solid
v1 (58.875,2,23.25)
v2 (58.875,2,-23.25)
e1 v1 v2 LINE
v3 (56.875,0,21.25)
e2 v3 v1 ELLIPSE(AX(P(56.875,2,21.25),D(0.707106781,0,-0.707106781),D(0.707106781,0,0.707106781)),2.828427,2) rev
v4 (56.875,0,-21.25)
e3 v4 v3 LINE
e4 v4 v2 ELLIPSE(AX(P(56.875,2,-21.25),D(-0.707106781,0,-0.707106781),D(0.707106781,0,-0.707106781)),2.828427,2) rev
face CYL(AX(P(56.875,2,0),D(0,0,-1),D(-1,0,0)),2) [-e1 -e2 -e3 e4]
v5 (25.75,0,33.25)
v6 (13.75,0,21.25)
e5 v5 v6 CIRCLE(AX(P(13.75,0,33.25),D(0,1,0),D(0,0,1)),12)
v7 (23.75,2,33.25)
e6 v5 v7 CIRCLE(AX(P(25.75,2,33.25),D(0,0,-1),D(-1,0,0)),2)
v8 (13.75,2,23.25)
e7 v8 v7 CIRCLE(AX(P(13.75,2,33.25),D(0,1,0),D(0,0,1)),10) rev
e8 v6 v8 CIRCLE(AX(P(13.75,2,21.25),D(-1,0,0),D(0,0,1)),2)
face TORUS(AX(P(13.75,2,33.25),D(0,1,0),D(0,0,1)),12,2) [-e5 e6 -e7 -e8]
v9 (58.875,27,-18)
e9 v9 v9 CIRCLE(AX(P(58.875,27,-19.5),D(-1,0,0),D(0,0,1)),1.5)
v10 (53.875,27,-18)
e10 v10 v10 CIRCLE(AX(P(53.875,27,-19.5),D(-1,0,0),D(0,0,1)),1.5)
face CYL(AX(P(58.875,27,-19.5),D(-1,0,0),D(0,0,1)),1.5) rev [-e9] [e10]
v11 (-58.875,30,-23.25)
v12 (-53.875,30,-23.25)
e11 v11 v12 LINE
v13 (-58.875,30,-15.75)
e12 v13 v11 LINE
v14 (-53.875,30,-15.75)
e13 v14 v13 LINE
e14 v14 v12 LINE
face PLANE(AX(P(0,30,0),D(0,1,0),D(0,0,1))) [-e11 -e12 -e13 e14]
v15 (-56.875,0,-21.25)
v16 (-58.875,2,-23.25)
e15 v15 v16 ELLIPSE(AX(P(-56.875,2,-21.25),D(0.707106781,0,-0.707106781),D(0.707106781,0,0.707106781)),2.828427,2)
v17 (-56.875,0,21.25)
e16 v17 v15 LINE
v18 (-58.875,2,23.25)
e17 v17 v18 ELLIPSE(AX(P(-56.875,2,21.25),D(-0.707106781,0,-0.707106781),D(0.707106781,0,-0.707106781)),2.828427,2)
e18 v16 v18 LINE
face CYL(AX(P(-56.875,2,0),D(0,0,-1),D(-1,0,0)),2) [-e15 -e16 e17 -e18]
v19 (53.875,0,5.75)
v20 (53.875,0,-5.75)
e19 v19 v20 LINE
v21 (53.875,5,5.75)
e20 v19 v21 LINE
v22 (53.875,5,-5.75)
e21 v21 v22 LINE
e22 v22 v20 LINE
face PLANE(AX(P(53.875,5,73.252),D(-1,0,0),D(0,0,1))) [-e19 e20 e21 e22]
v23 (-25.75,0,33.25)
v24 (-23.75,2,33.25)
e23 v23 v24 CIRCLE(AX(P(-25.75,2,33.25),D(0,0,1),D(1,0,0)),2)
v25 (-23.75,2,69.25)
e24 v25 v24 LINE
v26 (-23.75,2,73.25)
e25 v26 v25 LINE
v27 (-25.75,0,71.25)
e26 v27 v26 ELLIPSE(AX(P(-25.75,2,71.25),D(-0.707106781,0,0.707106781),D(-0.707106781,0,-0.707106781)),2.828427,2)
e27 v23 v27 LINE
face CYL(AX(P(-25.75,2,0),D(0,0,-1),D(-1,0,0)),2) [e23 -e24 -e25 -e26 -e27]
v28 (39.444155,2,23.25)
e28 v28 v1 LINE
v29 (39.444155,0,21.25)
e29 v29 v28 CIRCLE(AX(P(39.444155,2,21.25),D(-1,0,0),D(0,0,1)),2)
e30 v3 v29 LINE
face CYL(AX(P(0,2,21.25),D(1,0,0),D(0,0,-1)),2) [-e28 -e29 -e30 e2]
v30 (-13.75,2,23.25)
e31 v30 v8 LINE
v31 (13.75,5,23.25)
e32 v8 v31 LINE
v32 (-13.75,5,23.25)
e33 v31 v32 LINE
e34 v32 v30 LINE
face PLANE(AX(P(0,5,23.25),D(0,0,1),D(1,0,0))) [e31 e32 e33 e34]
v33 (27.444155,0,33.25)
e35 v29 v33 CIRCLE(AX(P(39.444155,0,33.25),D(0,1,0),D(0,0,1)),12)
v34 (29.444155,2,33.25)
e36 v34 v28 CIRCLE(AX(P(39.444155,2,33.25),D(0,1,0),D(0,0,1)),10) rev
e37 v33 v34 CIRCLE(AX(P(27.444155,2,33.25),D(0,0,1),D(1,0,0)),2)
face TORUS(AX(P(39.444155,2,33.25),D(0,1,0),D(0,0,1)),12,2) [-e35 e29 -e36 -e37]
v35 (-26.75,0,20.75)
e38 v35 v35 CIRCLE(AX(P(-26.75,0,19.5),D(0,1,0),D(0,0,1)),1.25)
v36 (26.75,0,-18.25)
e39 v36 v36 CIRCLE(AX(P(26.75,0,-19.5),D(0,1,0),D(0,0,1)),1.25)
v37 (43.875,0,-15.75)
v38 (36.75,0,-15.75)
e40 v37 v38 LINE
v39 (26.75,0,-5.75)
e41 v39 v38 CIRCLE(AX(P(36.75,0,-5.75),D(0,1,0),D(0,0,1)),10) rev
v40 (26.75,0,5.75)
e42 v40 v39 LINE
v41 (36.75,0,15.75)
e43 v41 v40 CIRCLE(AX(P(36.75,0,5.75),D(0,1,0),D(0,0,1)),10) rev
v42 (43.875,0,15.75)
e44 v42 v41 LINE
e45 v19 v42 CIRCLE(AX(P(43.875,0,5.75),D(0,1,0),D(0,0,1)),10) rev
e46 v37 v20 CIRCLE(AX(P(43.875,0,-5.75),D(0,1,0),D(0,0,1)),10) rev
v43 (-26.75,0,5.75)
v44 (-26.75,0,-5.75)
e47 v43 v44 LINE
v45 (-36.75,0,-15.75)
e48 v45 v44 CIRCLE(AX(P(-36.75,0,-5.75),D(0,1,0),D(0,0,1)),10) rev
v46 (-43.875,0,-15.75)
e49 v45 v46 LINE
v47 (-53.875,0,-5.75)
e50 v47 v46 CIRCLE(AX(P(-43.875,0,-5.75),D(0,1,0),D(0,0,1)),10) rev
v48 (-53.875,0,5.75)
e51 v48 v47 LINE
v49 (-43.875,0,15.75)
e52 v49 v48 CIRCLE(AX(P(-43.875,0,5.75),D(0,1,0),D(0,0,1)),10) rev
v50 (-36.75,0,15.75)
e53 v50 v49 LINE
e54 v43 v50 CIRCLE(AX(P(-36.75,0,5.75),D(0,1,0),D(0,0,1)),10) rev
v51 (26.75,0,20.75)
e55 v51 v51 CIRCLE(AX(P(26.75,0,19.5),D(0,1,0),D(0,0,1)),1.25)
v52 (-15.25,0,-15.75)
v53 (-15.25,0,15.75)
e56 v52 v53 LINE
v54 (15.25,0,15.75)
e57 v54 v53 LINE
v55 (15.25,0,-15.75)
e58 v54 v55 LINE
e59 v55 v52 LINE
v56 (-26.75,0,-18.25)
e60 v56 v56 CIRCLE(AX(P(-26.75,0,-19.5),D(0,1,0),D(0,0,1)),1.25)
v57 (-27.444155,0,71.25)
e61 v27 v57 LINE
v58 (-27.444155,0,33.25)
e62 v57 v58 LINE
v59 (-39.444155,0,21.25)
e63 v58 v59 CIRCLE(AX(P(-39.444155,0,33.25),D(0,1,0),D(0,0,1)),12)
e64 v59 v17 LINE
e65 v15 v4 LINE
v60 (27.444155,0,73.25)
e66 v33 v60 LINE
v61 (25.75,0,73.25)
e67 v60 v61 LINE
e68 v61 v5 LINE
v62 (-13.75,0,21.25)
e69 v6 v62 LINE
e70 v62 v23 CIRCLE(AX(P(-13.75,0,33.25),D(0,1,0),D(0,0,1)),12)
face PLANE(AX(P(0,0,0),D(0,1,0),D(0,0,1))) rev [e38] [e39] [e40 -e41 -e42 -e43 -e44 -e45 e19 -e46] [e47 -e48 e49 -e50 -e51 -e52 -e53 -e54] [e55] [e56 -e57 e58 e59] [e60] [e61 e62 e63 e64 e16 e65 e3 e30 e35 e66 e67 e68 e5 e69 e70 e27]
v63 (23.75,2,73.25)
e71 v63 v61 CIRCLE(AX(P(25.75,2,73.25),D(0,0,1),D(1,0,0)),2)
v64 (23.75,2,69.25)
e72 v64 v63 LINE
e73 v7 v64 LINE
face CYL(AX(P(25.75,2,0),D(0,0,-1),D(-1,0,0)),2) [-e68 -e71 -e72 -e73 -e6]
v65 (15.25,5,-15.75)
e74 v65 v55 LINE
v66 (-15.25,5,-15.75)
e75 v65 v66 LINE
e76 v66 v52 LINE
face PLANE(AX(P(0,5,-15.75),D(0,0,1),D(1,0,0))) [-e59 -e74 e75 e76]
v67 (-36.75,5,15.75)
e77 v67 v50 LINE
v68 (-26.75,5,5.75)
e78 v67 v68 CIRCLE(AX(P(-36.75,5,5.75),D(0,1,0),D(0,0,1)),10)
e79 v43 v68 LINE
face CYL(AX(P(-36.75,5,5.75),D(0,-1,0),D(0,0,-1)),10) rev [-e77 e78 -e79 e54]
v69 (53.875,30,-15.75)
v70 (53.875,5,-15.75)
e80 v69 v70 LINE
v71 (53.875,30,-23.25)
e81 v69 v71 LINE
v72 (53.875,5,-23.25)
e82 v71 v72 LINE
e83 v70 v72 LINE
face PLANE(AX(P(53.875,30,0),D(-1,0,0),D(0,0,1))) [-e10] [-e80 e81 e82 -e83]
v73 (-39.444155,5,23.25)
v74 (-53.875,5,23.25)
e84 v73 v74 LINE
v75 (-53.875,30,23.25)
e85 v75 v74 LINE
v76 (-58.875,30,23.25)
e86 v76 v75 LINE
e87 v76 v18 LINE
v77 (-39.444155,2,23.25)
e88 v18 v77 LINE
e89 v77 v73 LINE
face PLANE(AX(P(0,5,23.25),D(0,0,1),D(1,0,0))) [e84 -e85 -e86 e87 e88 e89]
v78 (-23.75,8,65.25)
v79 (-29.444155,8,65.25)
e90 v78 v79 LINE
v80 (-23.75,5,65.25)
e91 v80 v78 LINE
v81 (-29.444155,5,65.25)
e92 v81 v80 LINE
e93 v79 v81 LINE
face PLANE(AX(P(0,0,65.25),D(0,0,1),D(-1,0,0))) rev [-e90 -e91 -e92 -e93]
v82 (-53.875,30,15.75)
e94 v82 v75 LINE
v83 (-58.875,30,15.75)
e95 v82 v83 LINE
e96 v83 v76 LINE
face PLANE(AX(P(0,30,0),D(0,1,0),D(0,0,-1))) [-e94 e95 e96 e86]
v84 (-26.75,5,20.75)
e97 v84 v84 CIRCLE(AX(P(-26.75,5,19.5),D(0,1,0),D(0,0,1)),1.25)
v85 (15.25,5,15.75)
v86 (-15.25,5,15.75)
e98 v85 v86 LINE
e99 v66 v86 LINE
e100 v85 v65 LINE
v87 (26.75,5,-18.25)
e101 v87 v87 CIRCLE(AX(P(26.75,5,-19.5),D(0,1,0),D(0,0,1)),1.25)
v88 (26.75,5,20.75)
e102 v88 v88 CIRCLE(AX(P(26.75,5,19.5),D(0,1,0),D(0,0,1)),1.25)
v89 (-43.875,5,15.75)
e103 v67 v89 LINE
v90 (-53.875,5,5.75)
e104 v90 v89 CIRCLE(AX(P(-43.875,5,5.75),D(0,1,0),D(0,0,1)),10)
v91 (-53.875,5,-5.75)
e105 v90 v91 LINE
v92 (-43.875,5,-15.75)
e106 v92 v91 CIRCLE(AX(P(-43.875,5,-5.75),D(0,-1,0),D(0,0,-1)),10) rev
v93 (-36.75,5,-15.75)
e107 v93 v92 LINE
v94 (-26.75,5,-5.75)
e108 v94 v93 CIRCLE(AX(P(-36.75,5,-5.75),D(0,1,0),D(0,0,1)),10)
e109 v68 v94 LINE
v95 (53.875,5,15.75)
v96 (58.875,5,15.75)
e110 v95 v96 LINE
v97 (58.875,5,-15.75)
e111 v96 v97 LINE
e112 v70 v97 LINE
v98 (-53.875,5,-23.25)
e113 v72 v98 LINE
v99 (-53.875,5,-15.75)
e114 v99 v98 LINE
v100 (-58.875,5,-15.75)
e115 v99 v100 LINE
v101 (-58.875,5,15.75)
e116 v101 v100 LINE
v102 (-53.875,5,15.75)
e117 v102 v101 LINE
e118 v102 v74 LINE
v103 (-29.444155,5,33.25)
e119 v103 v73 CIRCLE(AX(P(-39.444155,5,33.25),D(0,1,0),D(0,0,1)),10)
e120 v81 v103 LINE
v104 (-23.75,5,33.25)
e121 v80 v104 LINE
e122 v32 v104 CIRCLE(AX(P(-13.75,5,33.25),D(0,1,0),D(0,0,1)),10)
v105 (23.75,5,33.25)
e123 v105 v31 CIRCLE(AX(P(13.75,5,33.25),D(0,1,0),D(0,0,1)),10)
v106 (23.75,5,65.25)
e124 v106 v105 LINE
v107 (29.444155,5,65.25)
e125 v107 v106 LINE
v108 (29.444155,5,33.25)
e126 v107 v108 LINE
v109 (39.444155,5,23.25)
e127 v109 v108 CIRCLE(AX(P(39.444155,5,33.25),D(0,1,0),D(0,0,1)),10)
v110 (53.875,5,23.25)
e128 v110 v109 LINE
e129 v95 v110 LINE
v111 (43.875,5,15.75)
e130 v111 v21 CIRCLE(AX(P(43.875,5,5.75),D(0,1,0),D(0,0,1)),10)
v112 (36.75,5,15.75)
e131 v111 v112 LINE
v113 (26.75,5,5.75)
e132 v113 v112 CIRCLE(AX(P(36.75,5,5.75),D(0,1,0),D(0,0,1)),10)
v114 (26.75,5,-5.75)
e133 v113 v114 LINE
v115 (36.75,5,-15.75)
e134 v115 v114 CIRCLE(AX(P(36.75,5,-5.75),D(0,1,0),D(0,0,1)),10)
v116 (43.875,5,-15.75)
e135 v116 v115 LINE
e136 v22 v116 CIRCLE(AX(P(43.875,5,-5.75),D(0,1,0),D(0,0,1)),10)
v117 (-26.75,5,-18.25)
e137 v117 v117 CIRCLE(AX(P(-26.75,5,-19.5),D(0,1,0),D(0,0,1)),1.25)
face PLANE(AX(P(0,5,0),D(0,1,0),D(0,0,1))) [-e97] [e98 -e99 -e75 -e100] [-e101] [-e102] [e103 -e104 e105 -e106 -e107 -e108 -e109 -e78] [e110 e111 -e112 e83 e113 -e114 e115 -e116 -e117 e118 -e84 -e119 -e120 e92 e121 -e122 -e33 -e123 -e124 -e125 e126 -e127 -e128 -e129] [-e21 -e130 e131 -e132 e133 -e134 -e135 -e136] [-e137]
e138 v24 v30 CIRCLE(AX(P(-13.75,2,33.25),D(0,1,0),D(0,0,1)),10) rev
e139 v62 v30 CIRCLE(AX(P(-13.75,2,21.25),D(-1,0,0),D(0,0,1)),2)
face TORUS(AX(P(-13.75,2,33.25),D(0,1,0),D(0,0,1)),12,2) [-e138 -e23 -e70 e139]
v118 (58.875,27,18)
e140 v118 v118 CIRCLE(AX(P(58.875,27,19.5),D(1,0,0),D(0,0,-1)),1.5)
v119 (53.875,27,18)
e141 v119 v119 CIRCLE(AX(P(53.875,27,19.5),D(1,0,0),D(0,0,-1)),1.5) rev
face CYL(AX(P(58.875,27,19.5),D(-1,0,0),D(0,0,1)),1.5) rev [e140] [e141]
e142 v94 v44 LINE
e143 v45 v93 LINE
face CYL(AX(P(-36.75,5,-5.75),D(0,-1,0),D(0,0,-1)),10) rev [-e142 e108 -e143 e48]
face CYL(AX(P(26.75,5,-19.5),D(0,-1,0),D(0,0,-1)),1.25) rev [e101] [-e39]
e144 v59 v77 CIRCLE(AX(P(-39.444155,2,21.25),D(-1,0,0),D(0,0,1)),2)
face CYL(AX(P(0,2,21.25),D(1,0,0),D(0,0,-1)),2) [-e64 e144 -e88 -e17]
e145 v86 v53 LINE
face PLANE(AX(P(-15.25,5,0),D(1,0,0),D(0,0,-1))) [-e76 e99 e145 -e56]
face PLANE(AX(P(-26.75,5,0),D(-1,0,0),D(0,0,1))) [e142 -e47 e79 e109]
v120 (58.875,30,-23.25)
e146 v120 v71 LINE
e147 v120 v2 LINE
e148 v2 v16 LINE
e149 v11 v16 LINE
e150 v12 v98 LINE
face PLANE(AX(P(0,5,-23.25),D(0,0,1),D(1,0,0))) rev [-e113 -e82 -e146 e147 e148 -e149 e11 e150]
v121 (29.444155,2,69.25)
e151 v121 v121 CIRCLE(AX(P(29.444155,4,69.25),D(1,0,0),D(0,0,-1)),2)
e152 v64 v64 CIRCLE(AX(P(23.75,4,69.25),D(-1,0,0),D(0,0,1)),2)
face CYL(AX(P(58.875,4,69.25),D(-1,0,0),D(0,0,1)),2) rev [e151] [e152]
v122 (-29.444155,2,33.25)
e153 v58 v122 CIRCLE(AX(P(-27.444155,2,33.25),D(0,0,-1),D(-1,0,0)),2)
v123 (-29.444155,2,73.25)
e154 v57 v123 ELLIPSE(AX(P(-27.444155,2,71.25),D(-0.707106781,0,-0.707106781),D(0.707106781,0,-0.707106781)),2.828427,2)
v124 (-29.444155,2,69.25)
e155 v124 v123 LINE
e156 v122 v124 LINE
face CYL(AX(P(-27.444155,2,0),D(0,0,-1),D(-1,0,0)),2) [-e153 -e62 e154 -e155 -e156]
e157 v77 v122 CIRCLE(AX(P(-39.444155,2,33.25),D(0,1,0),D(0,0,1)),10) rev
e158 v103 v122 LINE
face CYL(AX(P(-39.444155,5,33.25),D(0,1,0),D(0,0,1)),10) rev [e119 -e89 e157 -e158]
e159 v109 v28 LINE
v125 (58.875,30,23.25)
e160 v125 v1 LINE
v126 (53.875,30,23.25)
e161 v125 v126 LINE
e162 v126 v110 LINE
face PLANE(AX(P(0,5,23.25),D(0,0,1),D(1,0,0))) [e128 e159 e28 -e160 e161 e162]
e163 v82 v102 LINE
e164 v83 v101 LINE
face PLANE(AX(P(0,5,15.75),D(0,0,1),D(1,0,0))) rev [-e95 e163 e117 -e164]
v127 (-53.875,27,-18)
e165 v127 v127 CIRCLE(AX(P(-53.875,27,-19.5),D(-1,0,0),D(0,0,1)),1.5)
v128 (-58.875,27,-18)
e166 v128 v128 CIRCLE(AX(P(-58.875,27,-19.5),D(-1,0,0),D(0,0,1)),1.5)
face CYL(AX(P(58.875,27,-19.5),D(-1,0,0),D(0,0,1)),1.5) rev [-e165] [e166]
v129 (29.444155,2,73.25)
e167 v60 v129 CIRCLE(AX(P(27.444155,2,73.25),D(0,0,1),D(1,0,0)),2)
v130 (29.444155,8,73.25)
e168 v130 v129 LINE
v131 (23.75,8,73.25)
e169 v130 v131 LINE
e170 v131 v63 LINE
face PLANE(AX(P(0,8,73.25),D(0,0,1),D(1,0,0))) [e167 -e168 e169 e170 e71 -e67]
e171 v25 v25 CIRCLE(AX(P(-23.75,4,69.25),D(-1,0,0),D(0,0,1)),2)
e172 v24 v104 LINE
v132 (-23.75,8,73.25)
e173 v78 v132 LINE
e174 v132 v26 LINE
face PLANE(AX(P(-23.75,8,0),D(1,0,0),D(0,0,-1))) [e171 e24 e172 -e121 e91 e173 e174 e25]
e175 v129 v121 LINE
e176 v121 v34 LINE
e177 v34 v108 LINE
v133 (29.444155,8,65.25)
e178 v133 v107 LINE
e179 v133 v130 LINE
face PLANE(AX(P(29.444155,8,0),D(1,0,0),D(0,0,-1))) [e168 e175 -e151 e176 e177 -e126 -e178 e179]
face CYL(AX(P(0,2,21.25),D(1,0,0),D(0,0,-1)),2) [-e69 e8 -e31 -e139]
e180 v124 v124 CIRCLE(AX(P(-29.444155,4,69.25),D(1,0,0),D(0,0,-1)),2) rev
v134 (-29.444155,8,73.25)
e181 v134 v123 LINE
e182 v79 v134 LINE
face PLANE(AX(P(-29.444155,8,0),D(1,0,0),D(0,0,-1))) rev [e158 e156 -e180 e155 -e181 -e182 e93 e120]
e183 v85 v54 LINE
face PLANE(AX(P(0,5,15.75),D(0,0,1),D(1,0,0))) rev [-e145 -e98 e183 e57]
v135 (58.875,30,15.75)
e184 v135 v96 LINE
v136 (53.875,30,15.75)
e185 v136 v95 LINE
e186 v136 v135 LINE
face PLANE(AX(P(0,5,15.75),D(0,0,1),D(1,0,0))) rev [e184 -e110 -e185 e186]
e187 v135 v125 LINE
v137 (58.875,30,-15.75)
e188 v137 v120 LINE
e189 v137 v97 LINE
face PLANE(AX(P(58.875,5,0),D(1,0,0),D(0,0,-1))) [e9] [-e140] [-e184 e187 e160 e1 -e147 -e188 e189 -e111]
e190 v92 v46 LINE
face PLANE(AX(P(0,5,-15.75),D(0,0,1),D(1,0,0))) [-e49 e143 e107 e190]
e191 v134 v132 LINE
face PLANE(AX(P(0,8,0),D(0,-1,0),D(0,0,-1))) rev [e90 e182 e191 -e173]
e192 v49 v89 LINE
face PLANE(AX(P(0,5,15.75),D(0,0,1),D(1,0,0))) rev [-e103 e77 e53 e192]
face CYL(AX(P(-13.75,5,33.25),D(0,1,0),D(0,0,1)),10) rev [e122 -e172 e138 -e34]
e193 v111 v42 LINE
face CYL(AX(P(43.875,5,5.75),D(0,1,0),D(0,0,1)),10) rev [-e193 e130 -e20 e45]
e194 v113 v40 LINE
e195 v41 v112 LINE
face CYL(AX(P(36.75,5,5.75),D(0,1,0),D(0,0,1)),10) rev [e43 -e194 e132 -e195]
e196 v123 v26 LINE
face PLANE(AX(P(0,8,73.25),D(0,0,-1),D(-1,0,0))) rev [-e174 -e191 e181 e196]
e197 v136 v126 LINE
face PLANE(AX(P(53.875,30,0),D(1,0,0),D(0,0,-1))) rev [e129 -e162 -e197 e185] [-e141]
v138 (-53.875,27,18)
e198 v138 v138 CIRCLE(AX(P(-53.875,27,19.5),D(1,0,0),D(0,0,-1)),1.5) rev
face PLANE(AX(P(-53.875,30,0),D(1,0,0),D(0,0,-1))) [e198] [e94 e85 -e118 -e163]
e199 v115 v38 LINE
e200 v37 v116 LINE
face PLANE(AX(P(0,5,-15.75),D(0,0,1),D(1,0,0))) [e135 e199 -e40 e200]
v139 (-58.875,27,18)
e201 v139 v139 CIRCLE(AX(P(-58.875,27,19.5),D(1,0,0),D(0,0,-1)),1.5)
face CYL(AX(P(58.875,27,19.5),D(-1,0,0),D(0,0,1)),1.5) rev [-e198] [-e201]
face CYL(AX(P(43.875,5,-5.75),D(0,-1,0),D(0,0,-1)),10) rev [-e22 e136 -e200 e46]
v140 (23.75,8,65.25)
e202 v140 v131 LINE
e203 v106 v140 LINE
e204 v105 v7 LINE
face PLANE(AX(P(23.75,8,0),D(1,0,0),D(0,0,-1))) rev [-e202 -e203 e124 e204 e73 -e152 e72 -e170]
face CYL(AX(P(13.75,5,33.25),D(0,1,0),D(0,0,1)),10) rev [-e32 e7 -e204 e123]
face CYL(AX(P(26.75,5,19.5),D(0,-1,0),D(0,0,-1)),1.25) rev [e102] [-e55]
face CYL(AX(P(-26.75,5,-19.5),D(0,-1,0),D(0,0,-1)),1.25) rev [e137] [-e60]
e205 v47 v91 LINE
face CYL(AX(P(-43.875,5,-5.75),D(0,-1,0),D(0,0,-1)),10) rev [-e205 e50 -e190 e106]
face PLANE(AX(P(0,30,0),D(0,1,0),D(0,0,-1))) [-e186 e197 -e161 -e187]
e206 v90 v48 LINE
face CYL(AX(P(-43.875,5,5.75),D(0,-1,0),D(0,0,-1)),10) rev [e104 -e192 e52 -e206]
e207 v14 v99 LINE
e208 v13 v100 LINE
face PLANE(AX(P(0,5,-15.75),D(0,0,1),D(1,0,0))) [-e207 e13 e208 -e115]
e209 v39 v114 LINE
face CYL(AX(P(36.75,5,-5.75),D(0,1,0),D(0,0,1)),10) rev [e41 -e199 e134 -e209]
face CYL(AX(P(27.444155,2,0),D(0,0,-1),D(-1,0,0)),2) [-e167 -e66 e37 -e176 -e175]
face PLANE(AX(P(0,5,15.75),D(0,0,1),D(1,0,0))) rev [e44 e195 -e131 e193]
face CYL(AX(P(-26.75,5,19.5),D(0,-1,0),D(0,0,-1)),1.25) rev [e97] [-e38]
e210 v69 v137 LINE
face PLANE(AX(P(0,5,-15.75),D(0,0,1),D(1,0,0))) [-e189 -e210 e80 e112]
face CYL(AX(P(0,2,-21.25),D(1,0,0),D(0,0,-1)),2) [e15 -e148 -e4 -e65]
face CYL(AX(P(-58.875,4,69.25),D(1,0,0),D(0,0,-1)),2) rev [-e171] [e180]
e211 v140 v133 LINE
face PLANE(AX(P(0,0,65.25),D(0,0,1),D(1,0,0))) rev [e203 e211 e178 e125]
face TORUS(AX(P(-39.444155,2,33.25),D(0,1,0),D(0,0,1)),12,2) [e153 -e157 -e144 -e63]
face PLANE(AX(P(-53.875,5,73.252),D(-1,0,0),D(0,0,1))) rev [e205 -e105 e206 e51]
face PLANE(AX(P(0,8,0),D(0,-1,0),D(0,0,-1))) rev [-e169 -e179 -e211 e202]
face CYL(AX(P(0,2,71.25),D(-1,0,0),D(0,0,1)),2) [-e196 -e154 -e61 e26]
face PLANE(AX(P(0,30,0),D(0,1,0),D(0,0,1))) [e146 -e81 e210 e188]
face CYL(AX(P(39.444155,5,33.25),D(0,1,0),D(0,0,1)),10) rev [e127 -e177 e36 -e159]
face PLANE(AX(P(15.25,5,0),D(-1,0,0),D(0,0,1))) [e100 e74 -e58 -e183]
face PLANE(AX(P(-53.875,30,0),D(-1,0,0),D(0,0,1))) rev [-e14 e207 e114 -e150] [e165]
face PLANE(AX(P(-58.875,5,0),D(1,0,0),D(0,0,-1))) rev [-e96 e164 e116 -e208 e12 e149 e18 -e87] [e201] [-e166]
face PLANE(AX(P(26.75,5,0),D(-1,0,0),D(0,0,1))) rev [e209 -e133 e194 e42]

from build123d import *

# Parameters (mm, degrees)
BOSS_EXTRUDE1_DEPTH     = 5
FILLET1_R               = 10
FILLET2_R               = 10
FILLET3_R               = 10
FILLET4_R               = 10
SKETCH2_W               = 5
SKETCH2_H               = 7.5
BOSS_EXTRUDE2_DEPTH     = 25
MIRROR2_COPY_1_SKETCH_W = 5
MIRROR2_COPY_1_SKETCH_H = 7.5
MIRROR2_COPY_1_DEPTH    = 25
SKETCH3_R               = 1.5
CUT_EXTRUDE1_DEPTH      = 119.966907163
SKETCH4_W               = 2.694155106
SKETCH4_H               = 50
SKETCH4_W_2             = 3
BOSS_EXTRUDE3_DEPTH     = 8
SKETCH5_W               = 5.694155106
SKETCH5_H               = 3
CUT_EXTRUDE2_DEPTH      = 42
CUT_EXTRUDE3_DEPTH      = 115.422257996
FILLET5_R               = 10
FILLET6_R               = 10
FILLET7_R               = 10
FILLET8_R               = 10
BOSS_EXTRUDE4_REACH     = 112.848
SKETCH7_W               = 5
SKETCH7_H               = 5
FILLET9_R               = 10
FILLET10_DEPTH          = 5
FILLET11_R              = 10
FILLET12_DEPTH          = 5
FILLET13_R              = 2


with BuildPart() as part:
    # Sketch1 → Boss-Extrude1 (new body)
    with BuildSketch(Plane(origin=(0, 0, 0), x_dir=(1, 0, 0), z_dir=(0, 1, 0))):
        with BuildLine():
            Line((-34.25, 15.75), (-26.75, 15.75))
            Line((-26.75, 15.75), (-26.75, 18.25))
            ThreePointArc((-26.75, 18.25), (-27.633883476, 20.383883476), (-25.5, 19.5))
            Line((-25.5, 19.5), (25.5, 19.5))
            ThreePointArc((25.5, 19.5), (26.75, 20.75), (28, 19.5))
            ThreePointArc((28, 19.5), (27.633883476, 18.616116524), (26.75, 18.25))
            Line((26.75, 18.25), (26.75, 15.75))
            Line((26.75, 15.75), (34.25, 15.75))
            Line((34.25, 15.75), (58.875, 15.75))
            Line((58.875, 15.75), (58.875, 23.25))
            Line((58.875, 23.25), (-58.875, 23.25))
            Line((-58.875, 23.25), (-58.875, 15.75))
            Line((-58.875, 15.75), (-34.25, 15.75))
        make_face()
        with BuildLine():
            Line((-26.75, 18.25), (-26.75, 15.75))
            Line((-26.75, 15.75), (-15.25, 15.75))
            Line((-15.25, 15.75), (15.25, 15.75))
            Line((15.25, 15.75), (26.75, 15.75))
            Line((26.75, 15.75), (26.75, 18.25))
            ThreePointArc((26.75, 18.25), (25.866116524, 18.616116524), (25.5, 19.5))
            Line((25.5, 19.5), (-25.5, 19.5))
            ThreePointArc((-25.5, 19.5), (-25.866116524, 18.616116524), (-26.75, 18.25))
        make_face()
        with BuildLine():
            Line((0, -19.5), (-25.5, -19.5))
            ThreePointArc((-25.5, -19.5), (-26.75, -20.75), (-28, -19.5))
            Line((-28, -19.5), (-58.875, -19.5))
            Line((-58.875, -19.5), (-58.875, -23.25))
            Line((-58.875, -23.25), (58.875, -23.25))
            Line((58.875, -23.25), (58.875, -15.75))
            Line((58.875, -15.75), (34.25, -15.75))
            Line((34.25, -15.75), (26.75, -15.75))
            Line((26.75, -15.75), (26.75, -18.25))
            ThreePointArc((26.75, -18.25), (27.633883476, -18.616116524), (28, -19.5))
            ThreePointArc((28, -19.5), (26.75, -20.75), (25.5, -19.5))
            Line((25.5, -19.5), (0, -19.5))
        make_face()
        with BuildLine():
            Line((-26.75, -15.75), (-26.75, -18.25))
            ThreePointArc((-26.75, -18.25), (-25.866116524, -18.616116524), (-25.5, -19.5))
            Line((-25.5, -19.5), (0, -19.5))
            Line((0, -19.5), (25.5, -19.5))
            ThreePointArc((25.5, -19.5), (25.866116524, -18.616116524), (26.75, -18.25))
            Line((26.75, -18.25), (26.75, -15.75))
            Line((26.75, -15.75), (15.25, -15.75))
            Line((15.25, -15.75), (-15.25, -15.75))
            Line((-15.25, -15.75), (-26.75, -15.75))
        make_face()
        with BuildLine():
            ThreePointArc((-28, -19.5), (-27.633883476, -18.616116524), (-26.75, -18.25))
            Line((-26.75, -18.25), (-26.75, -15.75))
            Line((-26.75, -15.75), (-34.25, -15.75))
            Line((-34.25, -15.75), (-58.875, -15.75))
            Line((-58.875, -15.75), (-58.875, -19.5))
            Line((-58.875, -19.5), (-28, -19.5))
        make_face()
        Polygon((-26.75, 0), (-26.75, -15.75), (-15.25, -15.75), (-15.25, 0), (-15.25, 15.75), (-26.75, 15.75), align=None)
        Polygon((15.25, 0), (15.25, -15.75), (26.75, -15.75), (26.75, 15.75), (15.25, 15.75), align=None)
    extrude(amount=BOSS_EXTRUDE1_DEPTH)

    # Fillet1
    fillet1_edges = [part.edges().sort_by_distance(p)[0] for p in [
        (-26.75, 2.5, -15.75),
    ]]
    fillet(fillet1_edges, radius=FILLET1_R)

    # Fillet2
    fillet2_edges = [part.edges().sort_by_distance(p)[0] for p in [
        (-26.75, 2.5, 15.75),
    ]]
    fillet(fillet2_edges, radius=FILLET2_R)

    # Fillet3
    fillet3_edges = [part.edges().sort_by_distance(p)[0] for p in [
        (26.75, 2.5, -15.75),
    ]]
    fillet(fillet3_edges, radius=FILLET3_R)

    # Fillet4
    fillet4_edges = [part.edges().sort_by_distance(p)[0] for p in [
        (26.75, 2.5, 15.75),
    ]]
    fillet(fillet4_edges, radius=FILLET4_R)

    # Sketch2 → Boss-Extrude2 (add)
    with BuildSketch(Plane(origin=(0, 5, 0), x_dir=(1, 0, 0), z_dir=(0, 1, 0))):
        with Locations((56.375, 19.5)):
            Rectangle(SKETCH2_W, SKETCH2_H)
    boss_extrude2 = extrude(amount=BOSS_EXTRUDE2_DEPTH)

    # Mirror1: Boss-Extrude2 across plane
    add(boss_extrude2.mirror(Plane(origin=(0, 0, 0), x_dir=(0, 0, 1), z_dir=(1, 0, 0))))

    # Mirror2: Boss-Extrude2 across plane
    add(boss_extrude2.mirror(Plane.XY))

    # Mirror2 copy 1 sketch → Mirror2 copy 1 (add)
    with BuildSketch(Plane(origin=(0, 5, 0), x_dir=(-1, 0, 0), z_dir=(0, 1, 0))):
        with Locations((56.375, 19.5)):
            Rectangle(MIRROR2_COPY_1_SKETCH_W, MIRROR2_COPY_1_SKETCH_H)
    extrude(amount=MIRROR2_COPY_1_DEPTH)

    # Sketch3 → Cut-Extrude1 (cut, symmetric)
    with BuildSketch(Plane.ZY.offset(-53.875)):
        with Locations((-19.5, 27)):
            Circle(SKETCH3_R)
    cut_extrude1 = extrude(amount=CUT_EXTRUDE1_DEPTH, both=True, mode=Mode.SUBTRACT)

    # Mirror3: Cut-Extrude1 across plane
    add(cut_extrude1.mirror(Plane.XY), mode=Mode.SUBTRACT)

    # Sketch4 → Boss-Extrude3 (add)
    with BuildSketch(Plane(origin=(0, 0, 0), x_dir=(-1, 0, 0), z_dir=(0, -1, 0))):
        with Locations((-28.097077553, -48.25)):
            Rectangle(SKETCH4_W, SKETCH4_H)
        with Locations((-25.25, -48.25)):
            Rectangle(SKETCH4_W_2, SKETCH4_H)
    boss_extrude3 = extrude(amount=-BOSS_EXTRUDE3_DEPTH)

    # Sketch5 → Cut-Extrude2 (cut)
    with BuildSketch(Plane(origin=(0, 0, 23.25), x_dir=(-1, 0, 0), z_dir=(0, 0, -1))):
        with Locations((-26.597077553, 6.5)):
            Rectangle(SKETCH5_W, SKETCH5_H)
    cut_extrude2 = extrude(amount=-CUT_EXTRUDE2_DEPTH, mode=Mode.SUBTRACT)

    # Sketch6 → Cut-Extrude3 (cut, through all)
    with BuildSketch(Plane.ZY.offset(-23.75)):
        with BuildLine():
            ThreePointArc((71.25, 4), (70.664213562, 5.414213562), (69.25, 6))
            Line((69.25, 6), (69.25, 2))
            ThreePointArc((69.25, 2), (70.664213562, 2.585786438), (71.25, 4))
        make_face()
        with BuildLine():
            Line((69.25, 2), (69.25, 6))
            ThreePointArc((69.25, 6), (67.25, 4), (69.25, 2))
        make_face()
    cut_extrude3 = extrude(amount=-CUT_EXTRUDE3_DEPTH, mode=Mode.SUBTRACT)

    # Fillet5
    fillet5_edges = [part.edges().sort_by_distance(p)[0] for p in [
        (23.75, 2.5, 23.25),
    ]]
    fillet(fillet5_edges, radius=FILLET5_R)

    # Fillet6
    fillet6_edges = [part.edges().sort_by_distance(p)[0] for p in [
        (29.444155106, 2.5, 23.25),
    ]]
    fillet(fillet6_edges, radius=FILLET6_R)

    # Mirror4: Boss-Extrude3, Cut-Extrude2, Cut-Extrude3 across plane
    add(boss_extrude3.mirror(Plane(origin=(0, 0, 0), x_dir=(0, 0, 1), z_dir=(1, 0, 0))))
    add(cut_extrude2.mirror(Plane(origin=(0, 0, 0), x_dir=(0, 0, 1), z_dir=(1, 0, 0))), mode=Mode.SUBTRACT)
    add(cut_extrude3.mirror(Plane(origin=(0, 0, 0), x_dir=(0, 0, 1), z_dir=(1, 0, 0))), mode=Mode.SUBTRACT)

    # Fillet7
    fillet7_edges = [part.edges().sort_by_distance(p)[0] for p in [
        (-23.75, 2.5, 23.25),
    ]]
    fillet(fillet7_edges, radius=FILLET7_R)

    # Fillet8
    fillet8_edges = [part.edges().sort_by_distance(p)[0] for p in [
        (-29.444155106, 2.5, 23.25),
    ]]
    fillet(fillet8_edges, radius=FILLET8_R)

    # Sketch7 → Boss-Extrude4 (add, up to next)
    with BuildSketch(Plane.XY.offset(-15.75), mode=Mode.PRIVATE) as boss_extrude4_sk1:
        with Locations((-56.375, 2.5)):
            Rectangle(SKETCH7_W, SKETCH7_H)
    boss_extrude4_tool1 = extrude(boss_extrude4_sk1.sketch, amount=BOSS_EXTRUDE4_REACH, mode=Mode.PRIVATE) - part.part
    boss_extrude4 = boss_extrude4_tool1.solids().sort_by_distance((-56.375, 2.5, -15.75))[0]
    add(boss_extrude4)

    # Mirror5: Boss-Extrude4 across plane
    add(boss_extrude4.mirror(Plane(origin=(0, 0, 0), x_dir=(0, 0, 1), z_dir=(1, 0, 0))))

    # Fillet9
    # the kernel refuses this fillet: 10 mm, written as the material it adds along each edge
    with BuildSketch(Plane(origin=(53.875, 0, -15.75), x_dir=(0, 0, 1), z_dir=(0, 1, 0))) as fillet9_piece_1:
        with BuildLine():
            CenterArc((FILLET9_R, -FILLET9_R), FILLET9_R, 90, 90)
            Line((0, -FILLET9_R), (0, 0))
            Line((0, 0), (FILLET9_R, 0))
        make_face()
    extrude(amount=5)

    # Fillet10: read off the stored shape, not the designer's step
    # Fillet10 outline → Fillet10 (add)
    with BuildSketch(Plane(origin=(0, 0, 0), x_dir=(1, 0, 0), z_dir=(0, 1, 0))):
        with BuildLine():
            ThreePointArc((53.875, -5.75), (50.946067812, -12.821067812), (43.875, -15.75))
            Line((43.875, -15.75), (53.875, -15.75))
            Line((53.875, -15.75), (53.875, -5.75))
        make_face()
    extrude(amount=FILLET10_DEPTH)

    # Fillet11
    # the kernel refuses this fillet: 10 mm, written as the material it adds along each edge
    with BuildSketch(Plane(origin=(-53.875, 0, -15.75), x_dir=(1, 0, 0), z_dir=(0, 1, 0))) as fillet11_piece_1:
        with BuildLine():
            CenterArc((FILLET11_R, -FILLET11_R), FILLET11_R, 90, 90)
            Line((0, -FILLET11_R), (0, 0))
            Line((0, 0), (FILLET11_R, 0))
        make_face()
    extrude(amount=5)

    # Fillet12: read off the stored shape, not the designer's step
    # Fillet12 outline → Fillet12 (add)
    with BuildSketch(Plane(origin=(0, 0, 0), x_dir=(1, 0, 0), z_dir=(0, 1, 0))):
        with BuildLine():
            Line((-53.875, -15.75), (-43.875, -15.75))
            ThreePointArc((-43.875, -15.75), (-50.946067812, -12.821067812), (-53.875, -5.75))
            Line((-53.875, -5.75), (-53.875, -15.75))
        make_face()
    extrude(amount=FILLET12_DEPTH)

    # Fillet13
    fillet13_edges = [part.edges().sort_by_distance(p)[0] for p in [
        (0, 0, 23.25),
        (23.75, 0, 53.25),
        (20.821067812, 0, 26.178932188),
        (29.444155106, 0, 53.25),
        (32.373087294, 0, 26.178932188),
        (-26.597077553, 0, 73.25),
        (-58.875, 0, 0),
        (0, 0, -23.25),
        (58.875, 0, 0),
        (-23.75, 0, 53.25),
        (-20.821067812, 0, 26.178932188),
        (-49.159577553, 0, 23.25),
        (-29.444155106, 0, 53.25),
        (-32.373087294, 0, 26.178932188),
        (49.159577553, 0, 23.25),
    ]]
    fillet(fillet13_edges, radius=FILLET13_R - 0.0001)  # a hair under: the kernel refuses the full size


solid = part.part
